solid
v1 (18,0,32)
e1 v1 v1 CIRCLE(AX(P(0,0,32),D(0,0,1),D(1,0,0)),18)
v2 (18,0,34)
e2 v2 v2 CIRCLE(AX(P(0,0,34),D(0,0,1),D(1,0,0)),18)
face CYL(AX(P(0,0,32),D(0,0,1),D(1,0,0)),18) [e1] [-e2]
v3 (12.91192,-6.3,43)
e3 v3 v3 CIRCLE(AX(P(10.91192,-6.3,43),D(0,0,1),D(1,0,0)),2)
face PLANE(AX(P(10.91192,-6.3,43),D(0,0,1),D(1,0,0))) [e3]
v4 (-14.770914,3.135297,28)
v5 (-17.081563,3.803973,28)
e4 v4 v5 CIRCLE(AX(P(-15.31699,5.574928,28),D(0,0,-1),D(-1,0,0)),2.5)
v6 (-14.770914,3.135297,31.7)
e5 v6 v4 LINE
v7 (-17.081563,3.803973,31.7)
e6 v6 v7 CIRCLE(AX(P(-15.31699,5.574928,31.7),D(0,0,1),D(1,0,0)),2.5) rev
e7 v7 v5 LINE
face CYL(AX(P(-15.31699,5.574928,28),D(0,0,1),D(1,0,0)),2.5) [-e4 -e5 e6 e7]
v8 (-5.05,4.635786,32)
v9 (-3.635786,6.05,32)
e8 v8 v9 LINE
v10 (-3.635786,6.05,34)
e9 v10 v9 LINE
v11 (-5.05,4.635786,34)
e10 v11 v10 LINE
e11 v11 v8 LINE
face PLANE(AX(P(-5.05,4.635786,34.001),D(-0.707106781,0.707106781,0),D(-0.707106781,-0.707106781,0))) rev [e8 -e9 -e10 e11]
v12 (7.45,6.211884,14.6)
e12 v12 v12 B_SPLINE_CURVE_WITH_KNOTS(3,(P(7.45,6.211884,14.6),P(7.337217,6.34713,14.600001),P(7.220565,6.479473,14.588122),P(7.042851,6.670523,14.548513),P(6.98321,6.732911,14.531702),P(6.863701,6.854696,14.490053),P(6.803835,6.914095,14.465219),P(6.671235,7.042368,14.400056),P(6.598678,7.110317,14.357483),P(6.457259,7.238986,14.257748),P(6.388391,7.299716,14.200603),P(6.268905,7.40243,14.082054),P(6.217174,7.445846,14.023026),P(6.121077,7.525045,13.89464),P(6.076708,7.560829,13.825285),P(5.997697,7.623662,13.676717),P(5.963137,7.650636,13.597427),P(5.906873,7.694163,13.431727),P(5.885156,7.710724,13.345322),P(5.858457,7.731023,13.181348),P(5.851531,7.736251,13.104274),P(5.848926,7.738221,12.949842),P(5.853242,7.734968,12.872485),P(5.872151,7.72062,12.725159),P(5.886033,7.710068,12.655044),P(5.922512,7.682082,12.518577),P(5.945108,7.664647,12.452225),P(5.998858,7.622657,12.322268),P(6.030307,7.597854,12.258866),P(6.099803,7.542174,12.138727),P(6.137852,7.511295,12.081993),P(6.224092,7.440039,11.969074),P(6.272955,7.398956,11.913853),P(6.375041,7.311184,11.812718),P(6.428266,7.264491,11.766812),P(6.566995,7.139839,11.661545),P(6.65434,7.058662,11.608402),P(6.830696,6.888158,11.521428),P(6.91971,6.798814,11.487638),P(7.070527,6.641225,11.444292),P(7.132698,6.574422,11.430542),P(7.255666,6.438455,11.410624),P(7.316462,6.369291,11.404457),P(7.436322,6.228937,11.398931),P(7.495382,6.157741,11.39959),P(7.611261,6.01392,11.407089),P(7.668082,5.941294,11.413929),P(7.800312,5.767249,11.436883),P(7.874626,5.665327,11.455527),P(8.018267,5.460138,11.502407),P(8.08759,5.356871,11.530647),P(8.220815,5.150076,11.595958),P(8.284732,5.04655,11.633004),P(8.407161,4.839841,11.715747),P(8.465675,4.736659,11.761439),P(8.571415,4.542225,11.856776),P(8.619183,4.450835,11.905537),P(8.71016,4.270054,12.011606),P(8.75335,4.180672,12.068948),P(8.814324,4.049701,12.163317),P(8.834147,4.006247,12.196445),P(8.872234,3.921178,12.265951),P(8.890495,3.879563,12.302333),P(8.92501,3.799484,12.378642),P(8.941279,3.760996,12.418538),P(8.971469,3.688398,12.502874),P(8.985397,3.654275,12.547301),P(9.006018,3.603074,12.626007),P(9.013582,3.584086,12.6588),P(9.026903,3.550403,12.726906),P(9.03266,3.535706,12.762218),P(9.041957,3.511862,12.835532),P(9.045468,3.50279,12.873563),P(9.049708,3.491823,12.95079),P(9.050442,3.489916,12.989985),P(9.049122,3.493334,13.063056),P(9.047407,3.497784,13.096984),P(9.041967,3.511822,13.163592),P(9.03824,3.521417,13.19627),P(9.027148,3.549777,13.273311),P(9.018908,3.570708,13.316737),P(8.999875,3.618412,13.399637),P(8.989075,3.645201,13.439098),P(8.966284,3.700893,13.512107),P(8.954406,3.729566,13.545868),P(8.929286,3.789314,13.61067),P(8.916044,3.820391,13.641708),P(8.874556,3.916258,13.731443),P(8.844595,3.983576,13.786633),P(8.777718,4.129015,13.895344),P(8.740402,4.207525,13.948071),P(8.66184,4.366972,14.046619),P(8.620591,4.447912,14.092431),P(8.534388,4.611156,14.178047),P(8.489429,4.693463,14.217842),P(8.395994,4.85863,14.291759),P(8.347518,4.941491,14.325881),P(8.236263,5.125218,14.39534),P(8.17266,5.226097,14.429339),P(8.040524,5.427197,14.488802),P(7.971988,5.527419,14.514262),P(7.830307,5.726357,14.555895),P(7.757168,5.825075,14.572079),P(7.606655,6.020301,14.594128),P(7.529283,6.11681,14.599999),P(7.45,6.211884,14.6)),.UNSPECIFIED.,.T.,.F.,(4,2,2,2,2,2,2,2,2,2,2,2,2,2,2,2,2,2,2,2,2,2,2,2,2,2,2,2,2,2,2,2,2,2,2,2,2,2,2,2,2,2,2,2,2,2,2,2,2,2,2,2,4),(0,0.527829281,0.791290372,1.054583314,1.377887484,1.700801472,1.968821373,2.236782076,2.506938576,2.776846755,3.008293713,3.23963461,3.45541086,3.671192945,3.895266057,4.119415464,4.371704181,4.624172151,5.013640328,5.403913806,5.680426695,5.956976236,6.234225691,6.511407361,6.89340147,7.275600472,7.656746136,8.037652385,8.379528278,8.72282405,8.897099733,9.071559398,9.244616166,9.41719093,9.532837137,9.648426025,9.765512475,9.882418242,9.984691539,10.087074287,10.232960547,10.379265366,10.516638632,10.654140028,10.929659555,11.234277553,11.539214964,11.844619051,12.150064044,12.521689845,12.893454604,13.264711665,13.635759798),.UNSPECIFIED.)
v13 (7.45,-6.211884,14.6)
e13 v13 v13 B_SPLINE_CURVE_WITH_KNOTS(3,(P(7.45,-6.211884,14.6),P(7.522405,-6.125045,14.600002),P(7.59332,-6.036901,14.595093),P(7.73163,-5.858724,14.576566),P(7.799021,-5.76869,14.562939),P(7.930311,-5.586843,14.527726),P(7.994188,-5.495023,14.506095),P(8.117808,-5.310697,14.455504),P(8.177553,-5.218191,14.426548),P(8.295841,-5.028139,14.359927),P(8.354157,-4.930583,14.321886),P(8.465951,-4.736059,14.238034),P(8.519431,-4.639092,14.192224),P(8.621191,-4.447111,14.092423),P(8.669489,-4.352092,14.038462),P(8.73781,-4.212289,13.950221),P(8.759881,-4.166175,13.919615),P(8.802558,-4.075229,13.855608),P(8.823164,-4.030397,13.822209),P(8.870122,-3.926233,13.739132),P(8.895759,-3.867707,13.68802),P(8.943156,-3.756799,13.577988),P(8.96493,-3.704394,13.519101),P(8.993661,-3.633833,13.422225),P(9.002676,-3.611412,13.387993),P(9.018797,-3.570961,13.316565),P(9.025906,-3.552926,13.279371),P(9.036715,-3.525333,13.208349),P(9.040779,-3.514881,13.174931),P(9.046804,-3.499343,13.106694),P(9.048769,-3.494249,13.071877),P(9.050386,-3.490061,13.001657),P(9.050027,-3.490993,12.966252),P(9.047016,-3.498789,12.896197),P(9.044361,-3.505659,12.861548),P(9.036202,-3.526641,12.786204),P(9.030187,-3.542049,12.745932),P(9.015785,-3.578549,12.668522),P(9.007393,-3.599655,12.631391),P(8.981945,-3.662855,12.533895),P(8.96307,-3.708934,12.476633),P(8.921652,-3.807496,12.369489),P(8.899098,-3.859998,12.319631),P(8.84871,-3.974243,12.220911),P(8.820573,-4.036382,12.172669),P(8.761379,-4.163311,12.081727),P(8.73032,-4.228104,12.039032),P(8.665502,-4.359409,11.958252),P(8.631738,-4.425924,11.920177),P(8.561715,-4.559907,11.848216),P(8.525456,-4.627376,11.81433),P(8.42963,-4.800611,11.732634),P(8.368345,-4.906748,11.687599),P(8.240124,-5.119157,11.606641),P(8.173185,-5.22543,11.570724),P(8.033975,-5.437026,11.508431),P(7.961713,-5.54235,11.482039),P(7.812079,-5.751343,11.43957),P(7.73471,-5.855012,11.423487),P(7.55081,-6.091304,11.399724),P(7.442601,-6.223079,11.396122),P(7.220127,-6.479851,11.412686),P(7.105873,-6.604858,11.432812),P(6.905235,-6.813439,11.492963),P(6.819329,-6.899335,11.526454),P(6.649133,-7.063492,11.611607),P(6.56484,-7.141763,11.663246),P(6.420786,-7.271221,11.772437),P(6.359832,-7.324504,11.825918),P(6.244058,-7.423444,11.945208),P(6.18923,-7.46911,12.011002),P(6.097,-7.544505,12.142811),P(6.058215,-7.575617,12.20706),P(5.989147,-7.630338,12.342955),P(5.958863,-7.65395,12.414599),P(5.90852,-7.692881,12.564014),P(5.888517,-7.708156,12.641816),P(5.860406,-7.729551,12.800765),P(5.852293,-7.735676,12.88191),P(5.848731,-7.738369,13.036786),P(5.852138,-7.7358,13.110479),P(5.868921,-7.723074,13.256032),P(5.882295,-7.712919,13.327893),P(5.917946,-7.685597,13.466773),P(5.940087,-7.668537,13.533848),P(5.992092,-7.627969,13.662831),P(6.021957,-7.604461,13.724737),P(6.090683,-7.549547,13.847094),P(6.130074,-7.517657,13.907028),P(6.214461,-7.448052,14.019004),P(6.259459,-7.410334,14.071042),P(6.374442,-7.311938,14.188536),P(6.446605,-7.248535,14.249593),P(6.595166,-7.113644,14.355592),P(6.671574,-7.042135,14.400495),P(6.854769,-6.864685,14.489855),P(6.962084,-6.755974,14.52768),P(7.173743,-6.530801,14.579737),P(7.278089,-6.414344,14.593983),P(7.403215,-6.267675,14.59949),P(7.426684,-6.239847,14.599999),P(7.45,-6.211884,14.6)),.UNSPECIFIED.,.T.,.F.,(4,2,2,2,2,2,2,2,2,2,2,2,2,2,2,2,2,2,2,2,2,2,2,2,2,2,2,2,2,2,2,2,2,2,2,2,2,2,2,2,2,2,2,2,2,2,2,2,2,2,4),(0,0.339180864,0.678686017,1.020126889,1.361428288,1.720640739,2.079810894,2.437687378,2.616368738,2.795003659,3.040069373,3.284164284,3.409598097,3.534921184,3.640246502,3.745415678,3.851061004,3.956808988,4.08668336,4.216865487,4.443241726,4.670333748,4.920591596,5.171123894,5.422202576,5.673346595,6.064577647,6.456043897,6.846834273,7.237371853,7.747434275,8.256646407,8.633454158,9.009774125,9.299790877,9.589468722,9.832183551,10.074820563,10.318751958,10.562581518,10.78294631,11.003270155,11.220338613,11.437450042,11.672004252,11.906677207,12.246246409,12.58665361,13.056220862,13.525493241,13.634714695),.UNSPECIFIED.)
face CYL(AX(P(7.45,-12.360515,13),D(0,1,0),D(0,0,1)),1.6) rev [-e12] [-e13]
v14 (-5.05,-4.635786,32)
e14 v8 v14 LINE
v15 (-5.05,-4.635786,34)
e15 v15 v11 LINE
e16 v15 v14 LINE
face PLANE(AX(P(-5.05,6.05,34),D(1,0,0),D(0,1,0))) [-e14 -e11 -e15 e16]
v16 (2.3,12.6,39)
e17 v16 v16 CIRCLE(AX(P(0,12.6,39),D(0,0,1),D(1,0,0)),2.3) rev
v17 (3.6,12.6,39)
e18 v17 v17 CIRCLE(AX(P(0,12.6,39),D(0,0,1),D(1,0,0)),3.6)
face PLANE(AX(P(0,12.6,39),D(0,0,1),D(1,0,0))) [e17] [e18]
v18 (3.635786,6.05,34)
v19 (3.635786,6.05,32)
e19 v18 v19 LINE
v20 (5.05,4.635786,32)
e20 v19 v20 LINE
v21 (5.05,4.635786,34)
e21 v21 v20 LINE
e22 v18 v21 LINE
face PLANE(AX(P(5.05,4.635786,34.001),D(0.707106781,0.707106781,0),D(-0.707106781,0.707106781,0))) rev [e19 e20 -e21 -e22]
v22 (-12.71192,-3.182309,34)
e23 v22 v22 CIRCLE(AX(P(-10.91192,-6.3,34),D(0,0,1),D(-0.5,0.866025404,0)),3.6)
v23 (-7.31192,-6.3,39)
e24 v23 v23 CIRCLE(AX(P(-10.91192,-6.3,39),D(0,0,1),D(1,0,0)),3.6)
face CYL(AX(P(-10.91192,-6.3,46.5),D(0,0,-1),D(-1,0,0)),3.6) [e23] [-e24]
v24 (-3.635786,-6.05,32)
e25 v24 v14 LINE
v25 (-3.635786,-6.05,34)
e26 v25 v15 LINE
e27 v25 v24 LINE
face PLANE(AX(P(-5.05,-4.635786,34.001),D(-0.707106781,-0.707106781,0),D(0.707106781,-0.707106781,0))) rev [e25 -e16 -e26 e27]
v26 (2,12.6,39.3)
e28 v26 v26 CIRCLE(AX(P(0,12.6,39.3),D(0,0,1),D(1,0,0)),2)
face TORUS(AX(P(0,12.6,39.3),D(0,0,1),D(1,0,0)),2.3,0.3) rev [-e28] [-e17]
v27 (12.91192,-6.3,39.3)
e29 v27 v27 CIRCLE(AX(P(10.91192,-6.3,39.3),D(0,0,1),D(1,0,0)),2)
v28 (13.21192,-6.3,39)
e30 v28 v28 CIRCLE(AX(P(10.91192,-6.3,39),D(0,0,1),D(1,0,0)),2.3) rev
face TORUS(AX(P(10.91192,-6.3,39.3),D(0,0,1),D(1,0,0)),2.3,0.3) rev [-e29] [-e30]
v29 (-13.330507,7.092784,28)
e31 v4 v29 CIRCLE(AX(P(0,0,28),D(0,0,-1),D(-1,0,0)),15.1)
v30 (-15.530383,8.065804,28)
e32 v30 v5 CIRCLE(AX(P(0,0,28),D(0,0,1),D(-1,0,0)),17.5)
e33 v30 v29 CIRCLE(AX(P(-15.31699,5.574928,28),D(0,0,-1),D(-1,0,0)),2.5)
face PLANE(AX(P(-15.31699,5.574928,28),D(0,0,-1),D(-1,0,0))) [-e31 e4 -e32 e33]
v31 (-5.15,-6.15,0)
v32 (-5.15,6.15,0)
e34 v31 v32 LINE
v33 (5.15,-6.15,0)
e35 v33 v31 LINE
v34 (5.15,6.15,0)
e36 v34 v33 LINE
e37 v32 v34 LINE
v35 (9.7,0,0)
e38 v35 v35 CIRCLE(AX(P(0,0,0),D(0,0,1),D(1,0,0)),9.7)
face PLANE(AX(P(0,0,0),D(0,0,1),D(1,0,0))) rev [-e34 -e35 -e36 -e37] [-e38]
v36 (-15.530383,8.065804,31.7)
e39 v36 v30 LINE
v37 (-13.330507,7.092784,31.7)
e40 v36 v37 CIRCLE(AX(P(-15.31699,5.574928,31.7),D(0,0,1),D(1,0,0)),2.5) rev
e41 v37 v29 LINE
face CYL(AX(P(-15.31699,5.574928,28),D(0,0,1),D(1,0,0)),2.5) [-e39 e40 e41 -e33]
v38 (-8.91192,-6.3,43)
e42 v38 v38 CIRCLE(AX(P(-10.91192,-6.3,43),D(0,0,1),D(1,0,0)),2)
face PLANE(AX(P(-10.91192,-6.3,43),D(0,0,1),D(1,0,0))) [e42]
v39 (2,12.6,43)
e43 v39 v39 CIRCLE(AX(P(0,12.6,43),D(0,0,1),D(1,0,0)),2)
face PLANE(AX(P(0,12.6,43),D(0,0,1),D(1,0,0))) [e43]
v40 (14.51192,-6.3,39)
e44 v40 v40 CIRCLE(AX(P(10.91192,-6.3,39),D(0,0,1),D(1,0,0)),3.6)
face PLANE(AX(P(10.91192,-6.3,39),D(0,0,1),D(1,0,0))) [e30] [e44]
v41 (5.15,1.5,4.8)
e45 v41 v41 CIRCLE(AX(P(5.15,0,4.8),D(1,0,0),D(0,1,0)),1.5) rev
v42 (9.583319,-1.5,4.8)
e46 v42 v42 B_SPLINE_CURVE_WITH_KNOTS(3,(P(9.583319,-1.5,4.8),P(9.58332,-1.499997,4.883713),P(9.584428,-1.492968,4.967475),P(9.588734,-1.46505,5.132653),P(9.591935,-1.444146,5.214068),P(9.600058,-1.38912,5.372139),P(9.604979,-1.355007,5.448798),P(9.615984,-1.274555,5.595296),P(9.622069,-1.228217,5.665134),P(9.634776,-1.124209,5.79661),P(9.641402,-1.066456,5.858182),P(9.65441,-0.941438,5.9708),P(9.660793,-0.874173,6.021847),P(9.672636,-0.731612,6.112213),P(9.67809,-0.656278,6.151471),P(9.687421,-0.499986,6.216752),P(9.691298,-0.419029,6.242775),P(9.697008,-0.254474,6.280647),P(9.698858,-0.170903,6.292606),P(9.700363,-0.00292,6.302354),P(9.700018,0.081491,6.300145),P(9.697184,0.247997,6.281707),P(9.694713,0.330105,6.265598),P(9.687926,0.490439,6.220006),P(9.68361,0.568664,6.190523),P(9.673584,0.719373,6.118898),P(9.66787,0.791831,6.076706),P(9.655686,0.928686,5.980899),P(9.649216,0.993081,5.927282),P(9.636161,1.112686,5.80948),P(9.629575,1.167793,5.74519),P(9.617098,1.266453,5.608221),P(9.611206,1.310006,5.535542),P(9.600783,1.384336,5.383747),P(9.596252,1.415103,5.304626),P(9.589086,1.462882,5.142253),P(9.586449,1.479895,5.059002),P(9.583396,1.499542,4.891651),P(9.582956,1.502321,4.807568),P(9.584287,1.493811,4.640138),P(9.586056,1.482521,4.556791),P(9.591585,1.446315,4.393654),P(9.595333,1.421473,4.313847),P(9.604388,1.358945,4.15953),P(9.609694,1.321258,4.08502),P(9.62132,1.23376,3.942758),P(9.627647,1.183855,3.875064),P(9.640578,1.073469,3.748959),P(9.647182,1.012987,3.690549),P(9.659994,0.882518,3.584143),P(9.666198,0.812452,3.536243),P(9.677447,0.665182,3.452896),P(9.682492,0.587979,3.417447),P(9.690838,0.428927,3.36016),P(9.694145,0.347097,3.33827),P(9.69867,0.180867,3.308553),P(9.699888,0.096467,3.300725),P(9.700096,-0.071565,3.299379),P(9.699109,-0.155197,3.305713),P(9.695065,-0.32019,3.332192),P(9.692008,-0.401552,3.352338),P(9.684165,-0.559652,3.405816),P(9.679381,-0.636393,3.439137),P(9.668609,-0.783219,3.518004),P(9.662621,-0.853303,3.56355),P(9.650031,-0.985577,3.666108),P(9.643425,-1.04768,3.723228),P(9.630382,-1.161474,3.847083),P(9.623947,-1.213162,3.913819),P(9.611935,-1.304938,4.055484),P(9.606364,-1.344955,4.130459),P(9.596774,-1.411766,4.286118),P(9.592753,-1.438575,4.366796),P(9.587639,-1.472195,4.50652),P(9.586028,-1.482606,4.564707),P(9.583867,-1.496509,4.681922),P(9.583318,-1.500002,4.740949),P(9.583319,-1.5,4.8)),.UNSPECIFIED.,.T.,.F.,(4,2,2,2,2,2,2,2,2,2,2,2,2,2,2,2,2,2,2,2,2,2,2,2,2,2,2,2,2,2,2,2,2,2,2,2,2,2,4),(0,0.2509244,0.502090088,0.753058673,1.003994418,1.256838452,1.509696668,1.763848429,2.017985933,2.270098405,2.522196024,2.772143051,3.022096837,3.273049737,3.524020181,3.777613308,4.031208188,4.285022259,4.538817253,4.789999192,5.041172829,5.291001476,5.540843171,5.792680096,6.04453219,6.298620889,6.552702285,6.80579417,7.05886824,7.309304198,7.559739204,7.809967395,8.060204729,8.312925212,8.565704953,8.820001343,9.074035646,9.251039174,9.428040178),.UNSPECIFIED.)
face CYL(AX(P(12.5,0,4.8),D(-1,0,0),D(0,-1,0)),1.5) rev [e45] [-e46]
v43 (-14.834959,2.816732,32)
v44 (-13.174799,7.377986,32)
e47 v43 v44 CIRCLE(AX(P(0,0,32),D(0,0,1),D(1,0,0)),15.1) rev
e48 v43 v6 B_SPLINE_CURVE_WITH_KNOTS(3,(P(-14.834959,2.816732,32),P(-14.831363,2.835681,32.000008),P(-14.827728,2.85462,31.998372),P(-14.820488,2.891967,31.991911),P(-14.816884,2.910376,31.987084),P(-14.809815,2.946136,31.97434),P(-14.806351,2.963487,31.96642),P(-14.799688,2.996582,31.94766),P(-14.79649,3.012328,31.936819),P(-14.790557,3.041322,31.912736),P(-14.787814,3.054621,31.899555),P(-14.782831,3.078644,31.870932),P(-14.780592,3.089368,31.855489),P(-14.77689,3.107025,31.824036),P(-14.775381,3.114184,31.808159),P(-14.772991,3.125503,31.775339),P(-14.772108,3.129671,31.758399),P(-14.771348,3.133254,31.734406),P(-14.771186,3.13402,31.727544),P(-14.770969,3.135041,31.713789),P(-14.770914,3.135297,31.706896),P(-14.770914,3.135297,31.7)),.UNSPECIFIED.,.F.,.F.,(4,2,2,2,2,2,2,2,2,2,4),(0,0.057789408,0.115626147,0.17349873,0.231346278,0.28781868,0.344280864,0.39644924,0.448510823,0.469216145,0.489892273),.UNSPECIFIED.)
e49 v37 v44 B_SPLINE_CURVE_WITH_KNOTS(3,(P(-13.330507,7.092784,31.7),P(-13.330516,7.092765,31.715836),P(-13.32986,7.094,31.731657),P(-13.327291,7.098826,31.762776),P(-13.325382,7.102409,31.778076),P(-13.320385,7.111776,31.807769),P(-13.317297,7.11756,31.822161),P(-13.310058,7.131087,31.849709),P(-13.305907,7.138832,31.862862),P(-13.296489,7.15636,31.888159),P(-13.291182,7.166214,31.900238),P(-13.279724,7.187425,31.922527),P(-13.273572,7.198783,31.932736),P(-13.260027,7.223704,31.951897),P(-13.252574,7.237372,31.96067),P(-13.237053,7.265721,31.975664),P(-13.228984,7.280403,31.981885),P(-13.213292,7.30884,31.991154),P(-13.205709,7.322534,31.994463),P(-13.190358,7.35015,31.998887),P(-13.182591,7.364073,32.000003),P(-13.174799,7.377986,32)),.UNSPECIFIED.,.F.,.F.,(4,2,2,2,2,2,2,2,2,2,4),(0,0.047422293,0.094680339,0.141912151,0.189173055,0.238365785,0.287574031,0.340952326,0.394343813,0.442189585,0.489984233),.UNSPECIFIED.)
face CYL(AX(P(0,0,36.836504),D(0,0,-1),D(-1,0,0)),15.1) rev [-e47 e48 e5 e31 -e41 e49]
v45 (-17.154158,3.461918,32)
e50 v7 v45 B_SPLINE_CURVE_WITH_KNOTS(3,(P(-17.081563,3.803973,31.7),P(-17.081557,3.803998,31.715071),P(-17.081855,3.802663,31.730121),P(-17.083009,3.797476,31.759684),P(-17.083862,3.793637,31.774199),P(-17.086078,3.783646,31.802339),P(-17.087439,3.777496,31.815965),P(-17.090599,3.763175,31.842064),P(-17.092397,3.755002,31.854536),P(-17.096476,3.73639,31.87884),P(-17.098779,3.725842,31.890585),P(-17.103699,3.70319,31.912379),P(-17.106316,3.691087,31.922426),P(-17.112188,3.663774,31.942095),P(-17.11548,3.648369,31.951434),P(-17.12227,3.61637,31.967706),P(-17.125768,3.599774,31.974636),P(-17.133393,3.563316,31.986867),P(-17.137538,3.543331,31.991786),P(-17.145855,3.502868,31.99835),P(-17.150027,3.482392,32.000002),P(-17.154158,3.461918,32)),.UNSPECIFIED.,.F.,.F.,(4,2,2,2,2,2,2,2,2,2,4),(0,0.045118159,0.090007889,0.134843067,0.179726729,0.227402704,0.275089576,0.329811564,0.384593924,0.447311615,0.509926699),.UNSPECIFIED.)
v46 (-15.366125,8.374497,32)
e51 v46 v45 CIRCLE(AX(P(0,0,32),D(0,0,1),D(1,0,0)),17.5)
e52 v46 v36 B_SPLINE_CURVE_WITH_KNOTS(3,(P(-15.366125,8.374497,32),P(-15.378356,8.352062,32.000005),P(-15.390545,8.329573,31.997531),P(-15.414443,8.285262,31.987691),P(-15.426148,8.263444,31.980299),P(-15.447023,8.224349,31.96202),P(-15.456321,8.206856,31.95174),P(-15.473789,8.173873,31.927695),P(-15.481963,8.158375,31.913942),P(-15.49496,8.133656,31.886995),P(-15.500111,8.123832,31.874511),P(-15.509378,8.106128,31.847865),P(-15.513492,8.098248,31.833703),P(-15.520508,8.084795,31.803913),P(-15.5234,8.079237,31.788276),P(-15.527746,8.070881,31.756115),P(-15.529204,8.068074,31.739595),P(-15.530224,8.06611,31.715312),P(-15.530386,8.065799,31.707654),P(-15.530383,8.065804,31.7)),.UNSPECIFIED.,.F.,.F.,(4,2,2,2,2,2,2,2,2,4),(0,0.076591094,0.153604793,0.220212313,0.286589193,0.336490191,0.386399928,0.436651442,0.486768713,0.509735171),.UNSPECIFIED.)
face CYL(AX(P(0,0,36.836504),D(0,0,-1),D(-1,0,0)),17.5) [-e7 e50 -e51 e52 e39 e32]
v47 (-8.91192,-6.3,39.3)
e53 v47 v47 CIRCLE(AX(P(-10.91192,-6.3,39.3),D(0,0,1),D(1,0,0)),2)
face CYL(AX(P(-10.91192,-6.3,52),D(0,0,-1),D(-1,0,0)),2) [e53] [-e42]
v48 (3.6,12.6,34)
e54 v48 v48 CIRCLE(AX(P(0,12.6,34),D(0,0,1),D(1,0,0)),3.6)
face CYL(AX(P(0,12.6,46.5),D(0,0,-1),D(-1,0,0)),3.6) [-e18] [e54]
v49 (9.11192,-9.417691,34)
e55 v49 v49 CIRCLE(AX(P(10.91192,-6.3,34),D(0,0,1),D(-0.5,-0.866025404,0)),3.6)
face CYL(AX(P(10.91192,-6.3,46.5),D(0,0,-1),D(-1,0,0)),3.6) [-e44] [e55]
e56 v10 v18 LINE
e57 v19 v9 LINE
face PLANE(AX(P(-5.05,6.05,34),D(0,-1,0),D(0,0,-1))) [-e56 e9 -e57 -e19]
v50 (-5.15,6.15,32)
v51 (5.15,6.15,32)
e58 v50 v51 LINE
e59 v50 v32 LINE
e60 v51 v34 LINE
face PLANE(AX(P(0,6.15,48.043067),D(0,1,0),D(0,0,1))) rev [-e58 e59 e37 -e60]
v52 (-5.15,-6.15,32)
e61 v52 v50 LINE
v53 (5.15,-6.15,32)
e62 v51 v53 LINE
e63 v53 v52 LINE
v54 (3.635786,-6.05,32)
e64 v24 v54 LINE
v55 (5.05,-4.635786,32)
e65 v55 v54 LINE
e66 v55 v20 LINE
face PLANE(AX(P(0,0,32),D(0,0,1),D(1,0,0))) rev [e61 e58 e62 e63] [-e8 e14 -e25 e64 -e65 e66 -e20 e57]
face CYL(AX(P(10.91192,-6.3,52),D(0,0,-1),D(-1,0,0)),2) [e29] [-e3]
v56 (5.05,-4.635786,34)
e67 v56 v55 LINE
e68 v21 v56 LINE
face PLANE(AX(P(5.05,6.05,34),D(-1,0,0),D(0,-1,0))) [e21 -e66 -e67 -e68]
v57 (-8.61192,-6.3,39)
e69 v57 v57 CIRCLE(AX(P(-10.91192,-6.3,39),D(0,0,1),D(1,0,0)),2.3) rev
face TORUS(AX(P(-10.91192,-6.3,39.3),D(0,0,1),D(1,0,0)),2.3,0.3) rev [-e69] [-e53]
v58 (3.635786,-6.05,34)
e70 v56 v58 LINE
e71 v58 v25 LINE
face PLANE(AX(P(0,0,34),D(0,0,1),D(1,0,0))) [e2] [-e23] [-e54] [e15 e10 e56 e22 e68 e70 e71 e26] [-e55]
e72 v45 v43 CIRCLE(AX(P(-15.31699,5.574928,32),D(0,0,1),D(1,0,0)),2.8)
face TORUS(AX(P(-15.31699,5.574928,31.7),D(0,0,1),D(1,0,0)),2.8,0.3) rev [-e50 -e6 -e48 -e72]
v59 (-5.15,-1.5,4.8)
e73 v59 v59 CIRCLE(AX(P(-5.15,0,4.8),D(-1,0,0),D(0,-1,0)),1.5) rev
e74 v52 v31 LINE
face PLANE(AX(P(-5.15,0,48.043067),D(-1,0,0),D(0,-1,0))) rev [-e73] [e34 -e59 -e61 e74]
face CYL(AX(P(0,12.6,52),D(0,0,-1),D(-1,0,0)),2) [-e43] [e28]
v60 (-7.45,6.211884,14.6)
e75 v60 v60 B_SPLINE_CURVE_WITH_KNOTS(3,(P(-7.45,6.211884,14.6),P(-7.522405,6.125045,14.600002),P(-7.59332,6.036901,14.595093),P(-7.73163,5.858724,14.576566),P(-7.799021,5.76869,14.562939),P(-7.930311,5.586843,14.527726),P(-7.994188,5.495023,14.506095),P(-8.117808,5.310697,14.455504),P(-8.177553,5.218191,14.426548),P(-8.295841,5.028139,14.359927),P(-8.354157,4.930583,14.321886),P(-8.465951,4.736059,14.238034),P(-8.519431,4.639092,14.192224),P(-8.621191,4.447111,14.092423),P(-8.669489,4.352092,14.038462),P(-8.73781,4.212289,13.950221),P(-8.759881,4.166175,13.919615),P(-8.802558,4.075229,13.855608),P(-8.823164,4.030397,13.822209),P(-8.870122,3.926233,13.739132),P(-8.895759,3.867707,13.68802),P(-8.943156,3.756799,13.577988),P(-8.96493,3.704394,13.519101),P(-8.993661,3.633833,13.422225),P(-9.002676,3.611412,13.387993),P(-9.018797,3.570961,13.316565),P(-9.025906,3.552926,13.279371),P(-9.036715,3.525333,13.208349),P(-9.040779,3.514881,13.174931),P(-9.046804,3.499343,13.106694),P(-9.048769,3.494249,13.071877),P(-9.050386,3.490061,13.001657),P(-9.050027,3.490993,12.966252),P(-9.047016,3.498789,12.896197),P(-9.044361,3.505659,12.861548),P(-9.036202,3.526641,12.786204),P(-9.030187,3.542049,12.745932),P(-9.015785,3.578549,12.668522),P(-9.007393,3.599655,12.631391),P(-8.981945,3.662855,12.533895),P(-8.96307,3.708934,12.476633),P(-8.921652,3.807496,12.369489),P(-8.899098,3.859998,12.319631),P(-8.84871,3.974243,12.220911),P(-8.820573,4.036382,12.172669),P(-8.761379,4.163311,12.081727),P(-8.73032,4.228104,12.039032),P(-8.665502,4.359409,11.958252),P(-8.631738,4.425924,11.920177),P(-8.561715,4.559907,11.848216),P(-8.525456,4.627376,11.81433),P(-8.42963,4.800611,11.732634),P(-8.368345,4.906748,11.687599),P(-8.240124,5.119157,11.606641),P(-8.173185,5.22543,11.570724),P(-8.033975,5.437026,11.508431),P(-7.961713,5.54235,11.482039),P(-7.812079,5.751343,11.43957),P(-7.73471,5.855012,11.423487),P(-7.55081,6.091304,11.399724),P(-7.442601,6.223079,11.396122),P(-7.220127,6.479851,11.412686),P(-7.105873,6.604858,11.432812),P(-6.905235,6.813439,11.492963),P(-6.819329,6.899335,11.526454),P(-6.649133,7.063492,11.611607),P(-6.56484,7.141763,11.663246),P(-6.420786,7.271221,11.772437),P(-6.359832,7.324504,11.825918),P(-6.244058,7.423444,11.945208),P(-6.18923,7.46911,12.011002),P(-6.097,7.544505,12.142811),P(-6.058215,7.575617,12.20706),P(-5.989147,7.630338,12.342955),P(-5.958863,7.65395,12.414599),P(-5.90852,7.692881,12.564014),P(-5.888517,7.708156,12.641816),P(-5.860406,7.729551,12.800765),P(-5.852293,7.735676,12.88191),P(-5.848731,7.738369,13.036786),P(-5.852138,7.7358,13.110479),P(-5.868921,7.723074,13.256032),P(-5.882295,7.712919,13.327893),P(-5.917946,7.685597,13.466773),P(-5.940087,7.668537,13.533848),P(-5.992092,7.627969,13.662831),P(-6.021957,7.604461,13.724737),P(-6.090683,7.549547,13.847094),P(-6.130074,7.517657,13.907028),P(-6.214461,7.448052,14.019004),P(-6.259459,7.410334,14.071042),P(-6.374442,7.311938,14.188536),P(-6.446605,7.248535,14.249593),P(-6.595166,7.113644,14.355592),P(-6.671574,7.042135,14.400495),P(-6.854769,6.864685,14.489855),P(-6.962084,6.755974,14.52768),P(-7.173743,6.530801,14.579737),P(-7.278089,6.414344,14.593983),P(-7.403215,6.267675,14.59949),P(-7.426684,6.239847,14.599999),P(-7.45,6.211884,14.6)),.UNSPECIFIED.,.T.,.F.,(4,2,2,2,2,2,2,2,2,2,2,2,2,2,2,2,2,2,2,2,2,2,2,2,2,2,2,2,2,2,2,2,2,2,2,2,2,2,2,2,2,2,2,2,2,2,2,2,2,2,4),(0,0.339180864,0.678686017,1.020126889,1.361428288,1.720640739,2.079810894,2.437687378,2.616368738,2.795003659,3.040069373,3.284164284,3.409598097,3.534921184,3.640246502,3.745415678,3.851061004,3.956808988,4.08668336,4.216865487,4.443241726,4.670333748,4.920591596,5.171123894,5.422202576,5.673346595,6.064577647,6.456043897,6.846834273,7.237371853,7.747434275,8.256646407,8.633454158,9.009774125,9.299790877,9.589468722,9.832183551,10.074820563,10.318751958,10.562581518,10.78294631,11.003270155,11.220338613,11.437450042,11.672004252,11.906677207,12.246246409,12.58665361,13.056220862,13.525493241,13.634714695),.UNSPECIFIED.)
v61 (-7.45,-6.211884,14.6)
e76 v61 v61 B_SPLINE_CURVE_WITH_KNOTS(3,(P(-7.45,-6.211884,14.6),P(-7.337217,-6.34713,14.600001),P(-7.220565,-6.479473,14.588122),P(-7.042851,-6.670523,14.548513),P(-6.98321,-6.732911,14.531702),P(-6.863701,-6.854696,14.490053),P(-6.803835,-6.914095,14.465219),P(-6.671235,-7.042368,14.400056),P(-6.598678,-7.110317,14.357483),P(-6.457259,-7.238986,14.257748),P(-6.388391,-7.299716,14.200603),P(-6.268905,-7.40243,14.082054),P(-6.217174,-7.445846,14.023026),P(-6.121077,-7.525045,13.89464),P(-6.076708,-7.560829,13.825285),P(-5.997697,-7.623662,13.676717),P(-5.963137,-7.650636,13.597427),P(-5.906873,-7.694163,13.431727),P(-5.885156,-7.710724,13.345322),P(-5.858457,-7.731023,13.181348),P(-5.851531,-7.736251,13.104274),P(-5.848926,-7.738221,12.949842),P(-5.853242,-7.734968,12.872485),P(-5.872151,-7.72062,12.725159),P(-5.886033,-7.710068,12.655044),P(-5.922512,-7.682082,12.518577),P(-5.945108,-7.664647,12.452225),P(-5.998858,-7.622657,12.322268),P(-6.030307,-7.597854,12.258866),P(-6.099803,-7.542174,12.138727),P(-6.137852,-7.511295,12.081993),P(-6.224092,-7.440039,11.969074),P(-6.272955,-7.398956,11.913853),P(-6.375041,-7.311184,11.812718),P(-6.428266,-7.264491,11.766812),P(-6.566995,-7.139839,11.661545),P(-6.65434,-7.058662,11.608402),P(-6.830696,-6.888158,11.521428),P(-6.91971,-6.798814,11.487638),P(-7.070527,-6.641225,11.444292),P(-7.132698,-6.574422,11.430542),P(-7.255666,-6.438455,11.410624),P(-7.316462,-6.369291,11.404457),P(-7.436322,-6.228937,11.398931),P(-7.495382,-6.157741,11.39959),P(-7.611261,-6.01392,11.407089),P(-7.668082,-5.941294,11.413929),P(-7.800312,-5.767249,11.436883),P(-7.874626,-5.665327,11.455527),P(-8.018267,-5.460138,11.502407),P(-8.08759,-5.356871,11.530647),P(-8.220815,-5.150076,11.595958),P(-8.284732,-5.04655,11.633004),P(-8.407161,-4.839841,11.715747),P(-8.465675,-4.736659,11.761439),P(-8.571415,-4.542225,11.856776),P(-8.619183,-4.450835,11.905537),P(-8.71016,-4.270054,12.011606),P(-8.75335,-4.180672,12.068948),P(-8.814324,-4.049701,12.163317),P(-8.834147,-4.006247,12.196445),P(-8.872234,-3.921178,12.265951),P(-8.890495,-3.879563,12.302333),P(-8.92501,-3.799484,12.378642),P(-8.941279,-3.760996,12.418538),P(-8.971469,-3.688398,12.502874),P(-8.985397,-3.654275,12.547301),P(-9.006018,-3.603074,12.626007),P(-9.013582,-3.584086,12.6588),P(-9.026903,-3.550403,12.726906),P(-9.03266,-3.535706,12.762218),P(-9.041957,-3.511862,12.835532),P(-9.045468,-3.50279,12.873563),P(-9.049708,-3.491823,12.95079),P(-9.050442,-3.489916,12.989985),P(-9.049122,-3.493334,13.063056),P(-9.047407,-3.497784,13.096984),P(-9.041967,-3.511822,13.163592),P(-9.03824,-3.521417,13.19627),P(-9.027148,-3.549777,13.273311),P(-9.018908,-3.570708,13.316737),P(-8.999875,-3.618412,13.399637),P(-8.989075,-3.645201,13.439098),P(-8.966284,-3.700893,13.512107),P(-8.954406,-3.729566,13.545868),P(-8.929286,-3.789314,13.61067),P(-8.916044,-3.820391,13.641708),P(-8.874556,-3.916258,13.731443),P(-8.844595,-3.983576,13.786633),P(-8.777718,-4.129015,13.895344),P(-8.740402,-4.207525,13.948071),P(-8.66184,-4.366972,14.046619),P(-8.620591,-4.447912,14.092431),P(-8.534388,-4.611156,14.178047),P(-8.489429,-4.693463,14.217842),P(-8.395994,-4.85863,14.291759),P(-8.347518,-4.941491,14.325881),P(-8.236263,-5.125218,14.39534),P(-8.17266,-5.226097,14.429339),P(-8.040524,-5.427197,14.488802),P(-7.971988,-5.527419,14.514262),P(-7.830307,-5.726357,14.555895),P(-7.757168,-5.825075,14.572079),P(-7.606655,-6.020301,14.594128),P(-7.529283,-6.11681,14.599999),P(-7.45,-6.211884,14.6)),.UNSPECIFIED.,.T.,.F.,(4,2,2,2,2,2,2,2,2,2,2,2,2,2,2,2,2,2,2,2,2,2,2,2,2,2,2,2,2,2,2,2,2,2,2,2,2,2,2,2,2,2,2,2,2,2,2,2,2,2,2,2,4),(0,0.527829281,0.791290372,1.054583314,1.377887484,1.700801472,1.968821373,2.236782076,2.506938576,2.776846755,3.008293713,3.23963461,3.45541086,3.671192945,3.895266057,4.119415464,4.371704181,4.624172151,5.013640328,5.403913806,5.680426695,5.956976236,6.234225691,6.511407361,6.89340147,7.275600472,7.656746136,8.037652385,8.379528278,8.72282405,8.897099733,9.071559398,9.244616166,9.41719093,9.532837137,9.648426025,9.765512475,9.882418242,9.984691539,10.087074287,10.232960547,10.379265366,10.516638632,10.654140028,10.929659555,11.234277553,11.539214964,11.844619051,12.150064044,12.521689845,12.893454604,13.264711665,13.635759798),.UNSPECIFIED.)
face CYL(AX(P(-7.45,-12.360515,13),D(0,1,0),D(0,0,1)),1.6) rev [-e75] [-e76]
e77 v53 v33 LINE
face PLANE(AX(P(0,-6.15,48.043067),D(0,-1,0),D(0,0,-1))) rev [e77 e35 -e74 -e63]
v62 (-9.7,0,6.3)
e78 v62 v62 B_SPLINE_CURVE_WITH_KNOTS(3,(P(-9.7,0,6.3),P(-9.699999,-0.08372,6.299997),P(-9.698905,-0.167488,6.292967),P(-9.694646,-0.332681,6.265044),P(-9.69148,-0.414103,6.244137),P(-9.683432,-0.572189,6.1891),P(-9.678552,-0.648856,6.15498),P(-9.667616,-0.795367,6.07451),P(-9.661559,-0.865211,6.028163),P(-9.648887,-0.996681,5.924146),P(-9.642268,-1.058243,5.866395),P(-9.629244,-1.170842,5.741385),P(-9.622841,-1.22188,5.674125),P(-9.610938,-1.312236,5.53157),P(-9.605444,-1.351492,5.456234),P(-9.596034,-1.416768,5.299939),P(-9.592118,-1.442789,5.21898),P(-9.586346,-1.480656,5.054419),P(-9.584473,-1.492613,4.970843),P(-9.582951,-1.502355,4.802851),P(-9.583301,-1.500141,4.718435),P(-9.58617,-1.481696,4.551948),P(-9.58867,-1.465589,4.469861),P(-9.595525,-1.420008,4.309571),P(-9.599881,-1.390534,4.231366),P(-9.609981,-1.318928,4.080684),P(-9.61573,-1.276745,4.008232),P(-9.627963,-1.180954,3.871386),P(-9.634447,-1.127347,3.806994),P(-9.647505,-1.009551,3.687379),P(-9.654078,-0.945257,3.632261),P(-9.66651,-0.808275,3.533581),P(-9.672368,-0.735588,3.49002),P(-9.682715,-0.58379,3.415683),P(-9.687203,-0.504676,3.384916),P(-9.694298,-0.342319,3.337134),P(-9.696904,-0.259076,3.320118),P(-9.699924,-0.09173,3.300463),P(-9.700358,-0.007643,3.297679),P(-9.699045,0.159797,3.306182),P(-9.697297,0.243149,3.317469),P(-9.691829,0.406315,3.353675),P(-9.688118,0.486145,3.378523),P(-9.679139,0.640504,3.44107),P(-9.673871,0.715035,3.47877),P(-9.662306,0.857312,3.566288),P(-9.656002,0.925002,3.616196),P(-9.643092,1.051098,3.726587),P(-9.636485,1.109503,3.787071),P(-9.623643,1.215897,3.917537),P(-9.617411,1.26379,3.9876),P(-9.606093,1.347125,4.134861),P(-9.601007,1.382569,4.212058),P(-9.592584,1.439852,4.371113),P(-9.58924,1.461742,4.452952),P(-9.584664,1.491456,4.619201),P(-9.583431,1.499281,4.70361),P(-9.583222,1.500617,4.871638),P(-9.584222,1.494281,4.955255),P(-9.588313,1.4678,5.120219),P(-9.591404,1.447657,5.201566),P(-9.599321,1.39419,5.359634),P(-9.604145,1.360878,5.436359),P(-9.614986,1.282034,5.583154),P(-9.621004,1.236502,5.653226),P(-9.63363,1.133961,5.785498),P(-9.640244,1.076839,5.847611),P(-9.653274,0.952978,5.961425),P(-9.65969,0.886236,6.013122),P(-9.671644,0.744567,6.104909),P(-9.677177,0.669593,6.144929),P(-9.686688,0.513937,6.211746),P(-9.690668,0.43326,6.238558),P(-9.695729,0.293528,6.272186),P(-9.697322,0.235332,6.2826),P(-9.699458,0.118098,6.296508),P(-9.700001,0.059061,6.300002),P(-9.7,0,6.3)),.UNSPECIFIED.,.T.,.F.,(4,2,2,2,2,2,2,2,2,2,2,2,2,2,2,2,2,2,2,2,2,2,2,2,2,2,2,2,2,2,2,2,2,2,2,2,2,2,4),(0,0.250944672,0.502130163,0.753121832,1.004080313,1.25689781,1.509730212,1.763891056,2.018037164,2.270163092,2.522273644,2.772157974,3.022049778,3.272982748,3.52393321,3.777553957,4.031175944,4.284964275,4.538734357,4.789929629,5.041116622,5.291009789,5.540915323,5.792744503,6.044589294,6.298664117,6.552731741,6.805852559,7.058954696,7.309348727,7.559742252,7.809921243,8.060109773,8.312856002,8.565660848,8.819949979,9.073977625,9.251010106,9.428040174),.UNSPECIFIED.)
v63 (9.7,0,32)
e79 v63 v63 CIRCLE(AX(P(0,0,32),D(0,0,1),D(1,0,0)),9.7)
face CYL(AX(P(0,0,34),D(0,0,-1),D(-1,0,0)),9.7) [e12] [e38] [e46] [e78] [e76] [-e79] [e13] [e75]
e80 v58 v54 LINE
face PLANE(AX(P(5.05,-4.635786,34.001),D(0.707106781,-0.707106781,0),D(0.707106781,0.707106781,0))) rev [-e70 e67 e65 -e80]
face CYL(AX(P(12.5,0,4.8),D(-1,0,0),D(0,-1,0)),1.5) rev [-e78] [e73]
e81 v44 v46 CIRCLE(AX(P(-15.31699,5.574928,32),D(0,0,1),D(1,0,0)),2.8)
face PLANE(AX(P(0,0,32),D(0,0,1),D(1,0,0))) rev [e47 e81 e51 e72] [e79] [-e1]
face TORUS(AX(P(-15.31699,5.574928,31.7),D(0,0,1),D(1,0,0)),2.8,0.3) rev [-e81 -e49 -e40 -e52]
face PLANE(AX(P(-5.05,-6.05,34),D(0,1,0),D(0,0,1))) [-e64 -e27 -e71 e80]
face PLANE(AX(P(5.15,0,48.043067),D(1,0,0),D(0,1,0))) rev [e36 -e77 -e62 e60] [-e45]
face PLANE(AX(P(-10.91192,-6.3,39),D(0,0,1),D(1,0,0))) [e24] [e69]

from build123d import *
from build123d.topology import SkipClean

# Parameters (mm, degrees)
SKETCH1_R               = 9.7
SKETCH1_W               = 10.1
SKETCH1_H               = 12.1
BOSS_EXTRUDE1_DEPTH     = 34
BOSS_EXTRUDE2_DEPTH     = 4
SKETCH7_W               = 10.1
SKETCH7_H               = 12.1
CUT_EXTRUDE3_DEPTH      = 2
CUT_EXTRUDE4_REACH      = 38.511
CUT_EXTRUDE5_DEPTH      = 39.275740737
CUT_EXTRUDE5_DEPTH_BACK = 39.275740737
SKETCH10_R              = 1.6
CUT_EXTRUDE6_DEPTH      = 41.209263059
CUT_EXTRUDE6_DEPTH_BACK = 41.209263059
SKETCH12_R              = 1.5
SKETCH13_R              = 14.7
SKETCH13_R_2            = 9.7
CUT_EXTRUDE_THIN1_DEPTH = 39.275740826
BOSS_EXTRUDE3_START     = -2
SKETCH15_R              = 18
SKETCH15_R_2            = 9.7
BOSS_EXTRUDE3_DEPTH     = 2
SKETCH26_R              = 3.6
BOSS_EXTRUDE9_DEPTH     = 12.5
SKETCH27_R              = 2
BOSS_EXTRUDE10_DEPTH    = 5.5
CIRPATTERN1_COUNT       = 3
SKETCH19_R              = 2.5
BOSS_EXTRUDE6_DEPTH     = 4
SKETCH20_W              = 10.3
SKETCH20_H              = 12.3
SKETCH20_W_2            = 10.1
SKETCH20_H_2            = 12.1
CUT_EXTRUDE_THIN2_DEPTH = 21.5
CHAMFER1_SIZE           = 0.1
SKETCH23_W              = 10.3
SKETCH23_H              = 12.3
CUT_EXTRUDE7_DEPTH      = 32
CUT_EXTRUDE8_START      = -4
CUT_EXTRUDE8_DEPTH      = 4
FILLET1_R               = 0.3
CUT_EXTRUDE9_START      = -0.5
SKETCH29_R              = 3.6
SKETCH29_R_2            = 2
CUT_EXTRUDE9_DEPTH      = 0.5
CUT_EXTRUDE10_START     = -0.5
SKETCH30_R              = 2
CUT_EXTRUDE10_DEPTH     = 0.5
CUT_EXTRUDE11_START     = -7
SKETCH31_R              = 3.6
SKETCH31_R_2            = 2
CUT_EXTRUDE11_DEPTH     = 7
CUT_EXTRUDE12_START     = -8.5
SKETCH32_R              = 2
CUT_EXTRUDE12_DEPTH     = 8.5
FILLET2_R               = 0.3


# Some blends are built 0.0001 mm under size
with BuildPart() as part:
    # Sketch1 → Boss-Extrude1 (new body)
    with BuildSketch(Plane.XY):
        Circle(SKETCH1_R)
        Rectangle(SKETCH1_W, SKETCH1_H, mode=Mode.SUBTRACT)
    extrude(amount=BOSS_EXTRUDE1_DEPTH)

    # Sketch5 → Boss-Extrude2 (add)
    with BuildSketch(Plane.XY.offset(34)):
        with BuildLine():
            ThreePointArc((-3.902147571, 8.865750199), (-4.761039652, 10.097562259), (-5.97741096, 10.978185561))
            ThreePointArc((-5.97741096, 10.978185561), (-6.25, 10.825317547), (-6.518682103, 10.665682521))
            ThreePointArc((-6.518682103, 10.665682521), (-6.364225607, 9.171962417), (-5.72689111, 7.812234025))
            ThreePointArc((-5.72689111, 7.812234025), (-6.226362181, 7.420289498), (-6.699084431, 6.996466968))
            ThreePointArc((-6.699084431, 6.996466968), (-7.927483519, 7.860233279), (-9.37168957, 8.271725008))
            ThreePointArc((-9.37168957, 8.271725008), (-9.575555539, 8.034845121), (-9.773435734, 7.792942573))
            ThreePointArc((-9.773435734, 7.792942573), (-9.11741174, 6.442132047), (-8.053458717, 5.382386547))
            ThreePointArc((-8.053458717, 5.382386547), (-8.388755074, 4.84325), (-8.688012841, 4.283306564))
            ThreePointArc((-8.688012841, 4.283306564), (-10.137755877, 4.67484416), (-11.635604106, 4.567572341))
            ThreePointArc((-11.635604106, 4.567572341), (-11.74615776, 4.275251792), (-11.849368775, 3.98025874))
            ThreePointArc((-11.849368775, 3.98025874), (-10.770903459, 2.935285476), (-9.408660347, 2.303343816))
            ThreePointArc((-9.408660347, 2.303343816), (-9.5393403, 1.682043073), (-9.629038681, 1.053516174))
            ThreePointArc((-9.629038681, 1.053516174), (-11.125265259, 0.925599843), (-12.496093063, 0.31250304))
            ThreePointArc((-12.496093063, 0.31250304), (-12.5, 0), (-12.496093063, -0.31250304))
            ThreePointArc((-12.496093063, -0.31250304), (-11.125265259, -0.925599843), (-9.629038681, -1.053516174))
            ThreePointArc((-9.629038681, -1.053516174), (-9.5393403, -1.682043073), (-9.408660347, -2.303343816))
            ThreePointArc((-9.408660347, -2.303343816), (-10.770903459, -2.935285476), (-11.849368775, -3.98025874))
            ThreePointArc((-11.849368775, -3.98025874), (-11.74615776, -4.275251792), (-11.635604106, -4.567572341))
            ThreePointArc((-11.635604106, -4.567572341), (-10.137755877, -4.67484416), (-8.688012841, -4.283306564))
            ThreePointArc((-8.688012841, -4.283306564), (-8.388755074, -4.84325), (-8.053458717, -5.382386547))
            ThreePointArc((-8.053458717, -5.382386547), (-9.11741174, -6.442132047), (-9.773435734, -7.792942573))
            ThreePointArc((-9.773435734, -7.792942573), (-9.575555539, -8.034845121), (-9.37168957, -8.271725008))
            ThreePointArc((-9.37168957, -8.271725008), (-7.927483519, -7.860233279), (-6.699084431, -6.996466968))
            ThreePointArc((-6.699084431, -6.996466968), (-6.226362181, -7.420289498), (-5.72689111, -7.812234025))
            ThreePointArc((-5.72689111, -7.812234025), (-6.364225607, -9.171962417), (-6.518682103, -10.665682521))
            ThreePointArc((-6.518682103, -10.665682521), (-6.25, -10.825317547), (-5.97741096, -10.978185561))
            ThreePointArc((-5.97741096, -10.978185561), (-4.761039652, -10.097562259), (-3.902147571, -8.865750199))
            ThreePointArc((-3.902147571, -8.865750199), (-3.312978118, -9.102332571), (-2.709575915, -9.299810784))
            ThreePointArc((-2.709575915, -9.299810784), (-2.84341994, -10.795518755), (-2.477679205, -12.251983748))
            ThreePointArc((-2.477679205, -12.251983748), (-2.170602221, -12.310096913), (-1.862168372, -12.360514915))
            ThreePointArc((-1.862168372, -12.360514915), (-1.020344137, -11.116976207), (-0.634554124, -9.665693111))
            ThreePointArc((-0.634554124, -9.665693111), (0, -9.6865), (0.634554124, -9.665693111))
            ThreePointArc((0.634554124, -9.665693111), (1.020344137, -11.116976207), (1.862168372, -12.360514915))
            ThreePointArc((1.862168372, -12.360514915), (2.170602221, -12.310096913), (2.477679205, -12.251983748))
            ThreePointArc((2.477679205, -12.251983748), (2.84341994, -10.795518755), (2.709575915, -9.299810784))
            ThreePointArc((2.709575915, -9.299810784), (3.312978118, -9.102332571), (3.902147571, -8.865750199))
            ThreePointArc((3.902147571, -8.865750199), (4.761039652, -10.097562259), (5.97741096, -10.978185561))
            ThreePointArc((5.97741096, -10.978185561), (6.25, -10.825317547), (6.518682103, -10.665682521))
            ThreePointArc((6.518682103, -10.665682521), (6.364225607, -9.171962417), (5.72689111, -7.812234025))
            ThreePointArc((5.72689111, -7.812234025), (6.226362181, -7.420289498), (6.699084431, -6.996466968))
            ThreePointArc((6.699084431, -6.996466968), (7.927483519, -7.860233279), (9.37168957, -8.271725008))
            ThreePointArc((9.37168957, -8.271725008), (9.575555539, -8.034845121), (9.773435734, -7.792942573))
            ThreePointArc((9.773435734, -7.792942573), (9.11741174, -6.442132047), (8.053458717, -5.382386547))
            ThreePointArc((8.053458717, -5.382386547), (8.388755074, -4.84325), (8.688012841, -4.283306564))
            ThreePointArc((8.688012841, -4.283306564), (10.137755877, -4.67484416), (11.635604106, -4.567572341))
            ThreePointArc((11.635604106, -4.567572341), (11.74615776, -4.275251792), (11.849368775, -3.98025874))
            ThreePointArc((11.849368775, -3.98025874), (10.770903459, -2.935285476), (9.408660347, -2.303343816))
            ThreePointArc((9.408660347, -2.303343816), (9.5393403, -1.682043073), (9.629038681, -1.053516174))
            ThreePointArc((9.629038681, -1.053516174), (11.125265259, -0.925599843), (12.496093063, -0.31250304))
            ThreePointArc((12.496093063, -0.31250304), (12.5, 0), (12.496093063, 0.31250304))
            ThreePointArc((12.496093063, 0.31250304), (11.125265259, 0.925599843), (9.629038681, 1.053516174))
            ThreePointArc((9.629038681, 1.053516174), (9.5393403, 1.682043073), (9.408660347, 2.303343816))
            ThreePointArc((9.408660347, 2.303343816), (10.770903459, 2.935285476), (11.849368775, 3.98025874))
            ThreePointArc((11.849368775, 3.98025874), (11.74615776, 4.275251792), (11.635604106, 4.567572341))
            ThreePointArc((11.635604106, 4.567572341), (10.137755877, 4.67484416), (8.688012841, 4.283306564))
            ThreePointArc((8.688012841, 4.283306564), (8.388755074, 4.84325), (8.053458717, 5.382386547))
            ThreePointArc((8.053458717, 5.382386547), (9.11741174, 6.442132047), (9.773435734, 7.792942573))
            ThreePointArc((9.773435734, 7.792942573), (9.575555539, 8.034845121), (9.37168957, 8.271725008))
            ThreePointArc((9.37168957, 8.271725008), (7.927483519, 7.860233279), (6.699084431, 6.996466968))
            ThreePointArc((6.699084431, 6.996466968), (6.226362181, 7.420289498), (5.72689111, 7.812234025))
            ThreePointArc((5.72689111, 7.812234025), (6.364225607, 9.171962417), (6.518682103, 10.665682521))
            ThreePointArc((6.518682103, 10.665682521), (6.25, 10.825317547), (5.97741096, 10.978185561))
            ThreePointArc((5.97741096, 10.978185561), (4.761039652, 10.097562259), (3.902147571, 8.865750199))
            ThreePointArc((3.902147571, 8.865750199), (3.312978118, 9.102332571), (2.709575915, 9.299810784))
            ThreePointArc((2.709575915, 9.299810784), (2.84341994, 10.795518755), (2.477679205, 12.251983748))
            ThreePointArc((2.477679205, 12.251983748), (2.170602221, 12.310096913), (1.862168372, 12.360514915))
            ThreePointArc((1.862168372, 12.360514915), (1.020344137, 11.116976207), (0.634554124, 9.665693111))
            ThreePointArc((0.634554124, 9.665693111), (0, 9.6865), (-0.634554124, 9.665693111))
            ThreePointArc((-0.634554124, 9.665693111), (-1.020344137, 11.116976207), (-1.862168372, 12.360514915))
            ThreePointArc((-1.862168372, 12.360514915), (-2.170602221, 12.310096913), (-2.477679205, 12.251983748))
            ThreePointArc((-2.477679205, 12.251983748), (-2.84341994, 10.795518755), (-2.709575915, 9.299810784))
            ThreePointArc((-2.709575915, 9.299810784), (-3.312978118, 9.102332571), (-3.902147571, 8.865750199))
        make_face()
    extrude(amount=-BOSS_EXTRUDE2_DEPTH)

    # Sketch7 → Cut-Extrude3 (cut)
    with BuildSketch(Plane(origin=(0, 0, 30), x_dir=(-1, 0, 0), z_dir=(0, 0, -1))):
        Rectangle(SKETCH7_W, SKETCH7_H)
    extrude(amount=-CUT_EXTRUDE3_DEPTH, mode=Mode.SUBTRACT)

    # Sketch8 → Cut-Extrude4 (cut, up to next)
    with BuildSketch(Plane(origin=(0, 0, 32), x_dir=(-1, 0, 0), z_dir=(0, 0, -1)), mode=Mode.PRIVATE) as cut_extrude4_sk1:
        Polygon((-5.05, -4.635786438), (-3.635786438, -6.05), (3.635786438, -6.05), (5.05, -4.635786438), (5.05, 4.635786438), (3.635786438, 6.05), (-3.635786438, 6.05), (-5.05, 4.635786438), align=None)
    cut_extrude4_tool1 = extrude(cut_extrude4_sk1.sketch, amount=-CUT_EXTRUDE4_REACH, mode=Mode.PRIVATE) & part.part
    add(cut_extrude4_tool1.solids().sort_by_distance((0, 0, 32))[0], mode=Mode.SUBTRACT)

    # Sketch10 → Cut-Extrude5 (cut, two sides: drawn at the far end of the back side and taken through both)
    with BuildSketch(Plane(origin=(0, 0, 0), x_dir=(1, 0, 0), z_dir=(0, 1, 0)).offset(-CUT_EXTRUDE5_DEPTH_BACK)):
        with Locations(Location((7.45, -13, 0), (0, 0, 270))):
            Circle(SKETCH10_R)
        with Locations(Location((-7.45, -13, 0), (0, 0, 270))):
            Circle(SKETCH10_R)
    extrude(amount=CUT_EXTRUDE5_DEPTH + CUT_EXTRUDE5_DEPTH_BACK, mode=Mode.SUBTRACT)

    # Sketch12 → Cut-Extrude6 (cut, two sides: drawn at the far end of the back side and taken through both)
    with BuildSketch(Plane.ZY.offset(-5.05).offset(-CUT_EXTRUDE6_DEPTH_BACK)):
        with Locations(Location((4.8, 0, 0), (0, 0, 270))):
            Circle(SKETCH12_R)
    extrude(amount=CUT_EXTRUDE6_DEPTH + CUT_EXTRUDE6_DEPTH_BACK, mode=Mode.SUBTRACT)

    # Sketch13 → Cut-Extrude-Thin1 (cut, through all)
    with SkipClean():  # the faces are left unmerged after this step: merging them gives an invalid solid
        with BuildSketch(Plane(origin=(0, 0, 0), x_dir=(-1, 0, 0), z_dir=(0, 0, -1))):
            Circle(SKETCH13_R)
            Circle(SKETCH13_R_2, mode=Mode.SUBTRACT)
        extrude(amount=-CUT_EXTRUDE_THIN1_DEPTH, mode=Mode.SUBTRACT)
    add(part.part.scale(1), mode=Mode.REPLACE)  # the faces are merged on a copy

    # Sketch15 → Boss-Extrude3 (add)
    with BuildSketch(Plane.XY.offset(34).offset(BOSS_EXTRUDE3_START)):
        Circle(SKETCH15_R)
        Circle(SKETCH15_R_2, mode=Mode.SUBTRACT)
    extrude(amount=BOSS_EXTRUDE3_DEPTH)

    # Sketch26 → Boss-Extrude9 (add)
    with BuildSketch(Plane.XY.offset(34)):
        with Locations((0, 12.6)):
            Circle(SKETCH26_R)
    boss_extrude9 = extrude(amount=BOSS_EXTRUDE9_DEPTH)

    # Sketch27 → Boss-Extrude10 (add)
    with BuildSketch(Plane.XY.offset(46.5)):
        with Locations((0, 12.6)):
            Circle(SKETCH27_R)
    boss_extrude10 = extrude(amount=BOSS_EXTRUDE10_DEPTH)

    # CirPattern1: Boss-Extrude9, Boss-Extrude10 ×3 about axis
    cirpattern1_axis = Axis((0, 0, 0), (0, 0, 1))
    add([boss_extrude9.rotate(cirpattern1_axis, i * 360 / CIRPATTERN1_COUNT) for i in range(1, CIRPATTERN1_COUNT)])
    add([boss_extrude10.rotate(cirpattern1_axis, i * 360 / CIRPATTERN1_COUNT) for i in range(1, CIRPATTERN1_COUNT)])

    # Sketch19 → Boss-Extrude6 (add)
    with BuildSketch(Plane(origin=(0, 0, 32), x_dir=(-1, 0, 0), z_dir=(0, 0, -1))):
        with Locations(Location((15.316989719, 5.574928336, 0), (0, 0, 70.299613612))):
            Circle(SKETCH19_R)
    extrude(amount=BOSS_EXTRUDE6_DEPTH)

    # Sketch20 → Cut-Extrude-Thin2 (cut)
    with BuildSketch(Plane(origin=(0, 0, 0), x_dir=(-1, 0, 0), z_dir=(0, 0, -1))):
        Rectangle(SKETCH20_W, SKETCH20_H)
        Rectangle(SKETCH20_W_2, SKETCH20_H_2, mode=Mode.SUBTRACT)
    extrude(amount=-CUT_EXTRUDE_THIN2_DEPTH, mode=Mode.SUBTRACT)

    # Chamfer1
    chamfer1_edges = [part.edges().sort_by_distance(p)[0] for p in [
        (5.05, 0, 21.5),
        (0, -6.05, 21.5),
        (-5.05, 0, 21.5),
        (0, 6.05, 21.5),
    ]]
    chamfer(chamfer1_edges, length=CHAMFER1_SIZE - 0.0001)  # a hair under: the kernel refuses the full size

    # Sketch23 → Cut-Extrude7 (cut)
    with BuildSketch(Plane(origin=(0, 0, 0), x_dir=(-1, 0, 0), z_dir=(0, 0, -1))):
        Rectangle(SKETCH23_W, SKETCH23_H)
    extrude(amount=-CUT_EXTRUDE7_DEPTH, mode=Mode.SUBTRACT)

    # Sketch28 → Cut-Extrude8 (cut)
    with BuildSketch(Plane(origin=(0, 0, 28), x_dir=(-1, 0, 0), z_dir=(0, 0, -1)).offset(CUT_EXTRUDE8_START)):
        with BuildLine():
            ThreePointArc((14.77091445, 3.135296848), (14.189358574, 5.164504164), (13.3305069, 7.092784064))
            ThreePointArc((13.3305069, 7.092784064), (12.967758167, 4.719877978), (14.77091445, 3.135296848))
        make_face()
        with BuildLine():
            ThreePointArc((17.081562792, 3.803973263), (16.444620864, 5.985352508), (15.530383138, 8.065804336))
            ThreePointArc((15.530383138, 8.065804336), (17.666221271, 6.429978695), (17.081562792, 3.803973263))
        make_face()
    extrude(amount=CUT_EXTRUDE8_DEPTH, mode=Mode.SUBTRACT)

    # Fillet1
    # the kernel refuses this fillet: 0.3 mm, written as the material it adds along each edge
    with BuildSketch(Plane(origin=(-15.316989719, 5.574928336, 32), x_dir=(0.4971011086580964, -0.8676926228630111, 0), z_dir=(0.8676926228630111, 0.4971011086580964, 0))) as fillet1_piece_1_section:
        with BuildLine():
            CenterArc((2.5 + FILLET1_R, FILLET1_R), FILLET1_R, 180, 90)
            Line((2.5, FILLET1_R), (2.5, 0))
            Line((2.5, 0), (2.5 + FILLET1_R, 0))
        make_face()
    fillet1_piece_1 = revolve(axis=Axis((-15.316989719, 5.574928336, 32), (0, 0, -1)), revolution_arc=91.896523831, mode=Mode.PRIVATE)
    fillet1_piece_1 = fillet1_piece_1 & Plane(origin=(0, 0, 31.914860787), x_dir=(-0.9760893023906327, 0.21736990076495918, 0), z_dir=(0, 0, 1)) * Cylinder(17.5, 12, mode=Mode.PRIVATE)
    fillet1_piece_1 = fillet1_piece_1 - Plane(origin=(0, 0, 31.914860787), x_dir=(-0.9782062549409082, 0.2076355528190754, 0), z_dir=(0, 0, 1)) * Cylinder(15.1, 12, mode=Mode.PRIVATE)
    add(fillet1_piece_1)
    with BuildSketch(Plane(origin=(-15.316989719, 5.574928336, 32), x_dir=(-0.37603227853722215, 0.9266065645667015, 0), z_dir=(-0.9266065645667015, -0.37603227853722215, 0))) as fillet1_piece_2_section:
        with BuildLine():
            CenterArc((2.5 + FILLET1_R, FILLET1_R), FILLET1_R, 180, 90)
            Line((2.5, FILLET1_R), (2.5, 0))
            Line((2.5, 0), (2.5 + FILLET1_R, 0))
        make_face()
    fillet1_piece_2 = revolve(axis=Axis((-15.316989719, 5.574928336, 32), (0, 0, -1)), revolution_arc=91.896523831, mode=Mode.PRIVATE)
    fillet1_piece_2 = fillet1_piece_2 & Plane(origin=(0, 0, 31.914860787), x_dir=(-0.9760893023906327, 0.21736990076495918, 0), z_dir=(0, 0, 1)) * Cylinder(17.5, 12, mode=Mode.PRIVATE)
    fillet1_piece_2 = fillet1_piece_2 - Plane(origin=(0, 0, 31.914860787), x_dir=(-0.9782062549409082, 0.2076355528190754, 0), z_dir=(0, 0, 1)) * Cylinder(15.1, 12, mode=Mode.PRIVATE)
    add(fillet1_piece_2)

    # Sketch29 → Cut-Extrude9 (cut)
    # profile 1 of 3: a face of its own
    with BuildSketch(Plane.XY.offset(46.5).offset(CUT_EXTRUDE9_START)):
        with Locations(Location((-10.911920088, -6.3, 0), (0, 0, 120))):
            Circle(SKETCH29_R)
        with Locations(Location((-10.911920088, -6.3, 0), (0, 0, 120))):
            Circle(SKETCH29_R_2, mode=Mode.SUBTRACT)
    # profile 2 of 3: a face of its own
    with BuildSketch(Plane.XY.offset(46.5).offset(CUT_EXTRUDE9_START)):
        with Locations(Location((10.911920088, -6.3, 0), (0, 0, 240))):
            Circle(SKETCH29_R)
        with Locations(Location((10.911920088, -6.3, 0), (0, 0, 240))):
            Circle(SKETCH29_R_2, mode=Mode.SUBTRACT)
    # profile 3 of 3: a face of its own
    with BuildSketch(Plane.XY.offset(46.5).offset(CUT_EXTRUDE9_START)):
        with Locations((0, 12.6)):
            Circle(SKETCH29_R)
        with Locations((0, 12.6)):
            Circle(SKETCH29_R_2, mode=Mode.SUBTRACT)
    extrude(amount=CUT_EXTRUDE9_DEPTH, mode=Mode.SUBTRACT)

    # Sketch30 → Cut-Extrude10 (cut)
    with BuildSketch(Plane.XY.offset(52).offset(CUT_EXTRUDE10_START)):
        with Locations((-10.911920088, -6.3)):
            Circle(SKETCH30_R)
        with Locations((0, 12.6)):
            Circle(SKETCH30_R)
        with Locations((10.911920088, -6.3)):
            Circle(SKETCH30_R)
    extrude(amount=CUT_EXTRUDE10_DEPTH, mode=Mode.SUBTRACT)

    # Sketch31 → Cut-Extrude11 (cut)
    # profile 1 of 3: a face of its own
    with BuildSketch(Plane.XY.offset(46).offset(CUT_EXTRUDE11_START)):
        with Locations((0, 12.6)):
            Circle(SKETCH31_R)
        with Locations((0, 12.6)):
            Circle(SKETCH31_R_2, mode=Mode.SUBTRACT)
    # profile 2 of 3: a face of its own
    with BuildSketch(Plane.XY.offset(46).offset(CUT_EXTRUDE11_START)):
        with Locations(Location((-10.911920088, -6.3, 0), (0, 0, 120))):
            Circle(SKETCH31_R)
        with Locations((-10.911920088, -6.3)):
            Circle(SKETCH31_R_2, mode=Mode.SUBTRACT)
    # profile 3 of 3: a face of its own
    with BuildSketch(Plane.XY.offset(46).offset(CUT_EXTRUDE11_START)):
        with Locations(Location((10.911920088, -6.3, 0), (0, 0, 240))):
            Circle(SKETCH31_R)
        with Locations((10.911920088, -6.3)):
            Circle(SKETCH31_R_2, mode=Mode.SUBTRACT)
    extrude(amount=CUT_EXTRUDE11_DEPTH, mode=Mode.SUBTRACT)

    # Sketch32 → Cut-Extrude12 (cut)
    with BuildSketch(Plane.XY.offset(51.5).offset(CUT_EXTRUDE12_START)):
        with Locations((-10.911920088, -6.3)):
            Circle(SKETCH32_R)
        with Locations((0, 12.6)):
            Circle(SKETCH32_R)
        with Locations((10.911920088, -6.3)):
            Circle(SKETCH32_R)
    extrude(amount=CUT_EXTRUDE12_DEPTH, mode=Mode.SUBTRACT)

    # Fillet2
    fillet2_edges = [part.edges().sort_by_distance(p)[0] for p in [
        (-2, 12.6, 39),
        (-12.911920088, -6.3, 39),
        (8.911920088, -6.3, 39),
    ]]
    fillet(fillet2_edges, radius=FILLET2_R)


solid = part.part
